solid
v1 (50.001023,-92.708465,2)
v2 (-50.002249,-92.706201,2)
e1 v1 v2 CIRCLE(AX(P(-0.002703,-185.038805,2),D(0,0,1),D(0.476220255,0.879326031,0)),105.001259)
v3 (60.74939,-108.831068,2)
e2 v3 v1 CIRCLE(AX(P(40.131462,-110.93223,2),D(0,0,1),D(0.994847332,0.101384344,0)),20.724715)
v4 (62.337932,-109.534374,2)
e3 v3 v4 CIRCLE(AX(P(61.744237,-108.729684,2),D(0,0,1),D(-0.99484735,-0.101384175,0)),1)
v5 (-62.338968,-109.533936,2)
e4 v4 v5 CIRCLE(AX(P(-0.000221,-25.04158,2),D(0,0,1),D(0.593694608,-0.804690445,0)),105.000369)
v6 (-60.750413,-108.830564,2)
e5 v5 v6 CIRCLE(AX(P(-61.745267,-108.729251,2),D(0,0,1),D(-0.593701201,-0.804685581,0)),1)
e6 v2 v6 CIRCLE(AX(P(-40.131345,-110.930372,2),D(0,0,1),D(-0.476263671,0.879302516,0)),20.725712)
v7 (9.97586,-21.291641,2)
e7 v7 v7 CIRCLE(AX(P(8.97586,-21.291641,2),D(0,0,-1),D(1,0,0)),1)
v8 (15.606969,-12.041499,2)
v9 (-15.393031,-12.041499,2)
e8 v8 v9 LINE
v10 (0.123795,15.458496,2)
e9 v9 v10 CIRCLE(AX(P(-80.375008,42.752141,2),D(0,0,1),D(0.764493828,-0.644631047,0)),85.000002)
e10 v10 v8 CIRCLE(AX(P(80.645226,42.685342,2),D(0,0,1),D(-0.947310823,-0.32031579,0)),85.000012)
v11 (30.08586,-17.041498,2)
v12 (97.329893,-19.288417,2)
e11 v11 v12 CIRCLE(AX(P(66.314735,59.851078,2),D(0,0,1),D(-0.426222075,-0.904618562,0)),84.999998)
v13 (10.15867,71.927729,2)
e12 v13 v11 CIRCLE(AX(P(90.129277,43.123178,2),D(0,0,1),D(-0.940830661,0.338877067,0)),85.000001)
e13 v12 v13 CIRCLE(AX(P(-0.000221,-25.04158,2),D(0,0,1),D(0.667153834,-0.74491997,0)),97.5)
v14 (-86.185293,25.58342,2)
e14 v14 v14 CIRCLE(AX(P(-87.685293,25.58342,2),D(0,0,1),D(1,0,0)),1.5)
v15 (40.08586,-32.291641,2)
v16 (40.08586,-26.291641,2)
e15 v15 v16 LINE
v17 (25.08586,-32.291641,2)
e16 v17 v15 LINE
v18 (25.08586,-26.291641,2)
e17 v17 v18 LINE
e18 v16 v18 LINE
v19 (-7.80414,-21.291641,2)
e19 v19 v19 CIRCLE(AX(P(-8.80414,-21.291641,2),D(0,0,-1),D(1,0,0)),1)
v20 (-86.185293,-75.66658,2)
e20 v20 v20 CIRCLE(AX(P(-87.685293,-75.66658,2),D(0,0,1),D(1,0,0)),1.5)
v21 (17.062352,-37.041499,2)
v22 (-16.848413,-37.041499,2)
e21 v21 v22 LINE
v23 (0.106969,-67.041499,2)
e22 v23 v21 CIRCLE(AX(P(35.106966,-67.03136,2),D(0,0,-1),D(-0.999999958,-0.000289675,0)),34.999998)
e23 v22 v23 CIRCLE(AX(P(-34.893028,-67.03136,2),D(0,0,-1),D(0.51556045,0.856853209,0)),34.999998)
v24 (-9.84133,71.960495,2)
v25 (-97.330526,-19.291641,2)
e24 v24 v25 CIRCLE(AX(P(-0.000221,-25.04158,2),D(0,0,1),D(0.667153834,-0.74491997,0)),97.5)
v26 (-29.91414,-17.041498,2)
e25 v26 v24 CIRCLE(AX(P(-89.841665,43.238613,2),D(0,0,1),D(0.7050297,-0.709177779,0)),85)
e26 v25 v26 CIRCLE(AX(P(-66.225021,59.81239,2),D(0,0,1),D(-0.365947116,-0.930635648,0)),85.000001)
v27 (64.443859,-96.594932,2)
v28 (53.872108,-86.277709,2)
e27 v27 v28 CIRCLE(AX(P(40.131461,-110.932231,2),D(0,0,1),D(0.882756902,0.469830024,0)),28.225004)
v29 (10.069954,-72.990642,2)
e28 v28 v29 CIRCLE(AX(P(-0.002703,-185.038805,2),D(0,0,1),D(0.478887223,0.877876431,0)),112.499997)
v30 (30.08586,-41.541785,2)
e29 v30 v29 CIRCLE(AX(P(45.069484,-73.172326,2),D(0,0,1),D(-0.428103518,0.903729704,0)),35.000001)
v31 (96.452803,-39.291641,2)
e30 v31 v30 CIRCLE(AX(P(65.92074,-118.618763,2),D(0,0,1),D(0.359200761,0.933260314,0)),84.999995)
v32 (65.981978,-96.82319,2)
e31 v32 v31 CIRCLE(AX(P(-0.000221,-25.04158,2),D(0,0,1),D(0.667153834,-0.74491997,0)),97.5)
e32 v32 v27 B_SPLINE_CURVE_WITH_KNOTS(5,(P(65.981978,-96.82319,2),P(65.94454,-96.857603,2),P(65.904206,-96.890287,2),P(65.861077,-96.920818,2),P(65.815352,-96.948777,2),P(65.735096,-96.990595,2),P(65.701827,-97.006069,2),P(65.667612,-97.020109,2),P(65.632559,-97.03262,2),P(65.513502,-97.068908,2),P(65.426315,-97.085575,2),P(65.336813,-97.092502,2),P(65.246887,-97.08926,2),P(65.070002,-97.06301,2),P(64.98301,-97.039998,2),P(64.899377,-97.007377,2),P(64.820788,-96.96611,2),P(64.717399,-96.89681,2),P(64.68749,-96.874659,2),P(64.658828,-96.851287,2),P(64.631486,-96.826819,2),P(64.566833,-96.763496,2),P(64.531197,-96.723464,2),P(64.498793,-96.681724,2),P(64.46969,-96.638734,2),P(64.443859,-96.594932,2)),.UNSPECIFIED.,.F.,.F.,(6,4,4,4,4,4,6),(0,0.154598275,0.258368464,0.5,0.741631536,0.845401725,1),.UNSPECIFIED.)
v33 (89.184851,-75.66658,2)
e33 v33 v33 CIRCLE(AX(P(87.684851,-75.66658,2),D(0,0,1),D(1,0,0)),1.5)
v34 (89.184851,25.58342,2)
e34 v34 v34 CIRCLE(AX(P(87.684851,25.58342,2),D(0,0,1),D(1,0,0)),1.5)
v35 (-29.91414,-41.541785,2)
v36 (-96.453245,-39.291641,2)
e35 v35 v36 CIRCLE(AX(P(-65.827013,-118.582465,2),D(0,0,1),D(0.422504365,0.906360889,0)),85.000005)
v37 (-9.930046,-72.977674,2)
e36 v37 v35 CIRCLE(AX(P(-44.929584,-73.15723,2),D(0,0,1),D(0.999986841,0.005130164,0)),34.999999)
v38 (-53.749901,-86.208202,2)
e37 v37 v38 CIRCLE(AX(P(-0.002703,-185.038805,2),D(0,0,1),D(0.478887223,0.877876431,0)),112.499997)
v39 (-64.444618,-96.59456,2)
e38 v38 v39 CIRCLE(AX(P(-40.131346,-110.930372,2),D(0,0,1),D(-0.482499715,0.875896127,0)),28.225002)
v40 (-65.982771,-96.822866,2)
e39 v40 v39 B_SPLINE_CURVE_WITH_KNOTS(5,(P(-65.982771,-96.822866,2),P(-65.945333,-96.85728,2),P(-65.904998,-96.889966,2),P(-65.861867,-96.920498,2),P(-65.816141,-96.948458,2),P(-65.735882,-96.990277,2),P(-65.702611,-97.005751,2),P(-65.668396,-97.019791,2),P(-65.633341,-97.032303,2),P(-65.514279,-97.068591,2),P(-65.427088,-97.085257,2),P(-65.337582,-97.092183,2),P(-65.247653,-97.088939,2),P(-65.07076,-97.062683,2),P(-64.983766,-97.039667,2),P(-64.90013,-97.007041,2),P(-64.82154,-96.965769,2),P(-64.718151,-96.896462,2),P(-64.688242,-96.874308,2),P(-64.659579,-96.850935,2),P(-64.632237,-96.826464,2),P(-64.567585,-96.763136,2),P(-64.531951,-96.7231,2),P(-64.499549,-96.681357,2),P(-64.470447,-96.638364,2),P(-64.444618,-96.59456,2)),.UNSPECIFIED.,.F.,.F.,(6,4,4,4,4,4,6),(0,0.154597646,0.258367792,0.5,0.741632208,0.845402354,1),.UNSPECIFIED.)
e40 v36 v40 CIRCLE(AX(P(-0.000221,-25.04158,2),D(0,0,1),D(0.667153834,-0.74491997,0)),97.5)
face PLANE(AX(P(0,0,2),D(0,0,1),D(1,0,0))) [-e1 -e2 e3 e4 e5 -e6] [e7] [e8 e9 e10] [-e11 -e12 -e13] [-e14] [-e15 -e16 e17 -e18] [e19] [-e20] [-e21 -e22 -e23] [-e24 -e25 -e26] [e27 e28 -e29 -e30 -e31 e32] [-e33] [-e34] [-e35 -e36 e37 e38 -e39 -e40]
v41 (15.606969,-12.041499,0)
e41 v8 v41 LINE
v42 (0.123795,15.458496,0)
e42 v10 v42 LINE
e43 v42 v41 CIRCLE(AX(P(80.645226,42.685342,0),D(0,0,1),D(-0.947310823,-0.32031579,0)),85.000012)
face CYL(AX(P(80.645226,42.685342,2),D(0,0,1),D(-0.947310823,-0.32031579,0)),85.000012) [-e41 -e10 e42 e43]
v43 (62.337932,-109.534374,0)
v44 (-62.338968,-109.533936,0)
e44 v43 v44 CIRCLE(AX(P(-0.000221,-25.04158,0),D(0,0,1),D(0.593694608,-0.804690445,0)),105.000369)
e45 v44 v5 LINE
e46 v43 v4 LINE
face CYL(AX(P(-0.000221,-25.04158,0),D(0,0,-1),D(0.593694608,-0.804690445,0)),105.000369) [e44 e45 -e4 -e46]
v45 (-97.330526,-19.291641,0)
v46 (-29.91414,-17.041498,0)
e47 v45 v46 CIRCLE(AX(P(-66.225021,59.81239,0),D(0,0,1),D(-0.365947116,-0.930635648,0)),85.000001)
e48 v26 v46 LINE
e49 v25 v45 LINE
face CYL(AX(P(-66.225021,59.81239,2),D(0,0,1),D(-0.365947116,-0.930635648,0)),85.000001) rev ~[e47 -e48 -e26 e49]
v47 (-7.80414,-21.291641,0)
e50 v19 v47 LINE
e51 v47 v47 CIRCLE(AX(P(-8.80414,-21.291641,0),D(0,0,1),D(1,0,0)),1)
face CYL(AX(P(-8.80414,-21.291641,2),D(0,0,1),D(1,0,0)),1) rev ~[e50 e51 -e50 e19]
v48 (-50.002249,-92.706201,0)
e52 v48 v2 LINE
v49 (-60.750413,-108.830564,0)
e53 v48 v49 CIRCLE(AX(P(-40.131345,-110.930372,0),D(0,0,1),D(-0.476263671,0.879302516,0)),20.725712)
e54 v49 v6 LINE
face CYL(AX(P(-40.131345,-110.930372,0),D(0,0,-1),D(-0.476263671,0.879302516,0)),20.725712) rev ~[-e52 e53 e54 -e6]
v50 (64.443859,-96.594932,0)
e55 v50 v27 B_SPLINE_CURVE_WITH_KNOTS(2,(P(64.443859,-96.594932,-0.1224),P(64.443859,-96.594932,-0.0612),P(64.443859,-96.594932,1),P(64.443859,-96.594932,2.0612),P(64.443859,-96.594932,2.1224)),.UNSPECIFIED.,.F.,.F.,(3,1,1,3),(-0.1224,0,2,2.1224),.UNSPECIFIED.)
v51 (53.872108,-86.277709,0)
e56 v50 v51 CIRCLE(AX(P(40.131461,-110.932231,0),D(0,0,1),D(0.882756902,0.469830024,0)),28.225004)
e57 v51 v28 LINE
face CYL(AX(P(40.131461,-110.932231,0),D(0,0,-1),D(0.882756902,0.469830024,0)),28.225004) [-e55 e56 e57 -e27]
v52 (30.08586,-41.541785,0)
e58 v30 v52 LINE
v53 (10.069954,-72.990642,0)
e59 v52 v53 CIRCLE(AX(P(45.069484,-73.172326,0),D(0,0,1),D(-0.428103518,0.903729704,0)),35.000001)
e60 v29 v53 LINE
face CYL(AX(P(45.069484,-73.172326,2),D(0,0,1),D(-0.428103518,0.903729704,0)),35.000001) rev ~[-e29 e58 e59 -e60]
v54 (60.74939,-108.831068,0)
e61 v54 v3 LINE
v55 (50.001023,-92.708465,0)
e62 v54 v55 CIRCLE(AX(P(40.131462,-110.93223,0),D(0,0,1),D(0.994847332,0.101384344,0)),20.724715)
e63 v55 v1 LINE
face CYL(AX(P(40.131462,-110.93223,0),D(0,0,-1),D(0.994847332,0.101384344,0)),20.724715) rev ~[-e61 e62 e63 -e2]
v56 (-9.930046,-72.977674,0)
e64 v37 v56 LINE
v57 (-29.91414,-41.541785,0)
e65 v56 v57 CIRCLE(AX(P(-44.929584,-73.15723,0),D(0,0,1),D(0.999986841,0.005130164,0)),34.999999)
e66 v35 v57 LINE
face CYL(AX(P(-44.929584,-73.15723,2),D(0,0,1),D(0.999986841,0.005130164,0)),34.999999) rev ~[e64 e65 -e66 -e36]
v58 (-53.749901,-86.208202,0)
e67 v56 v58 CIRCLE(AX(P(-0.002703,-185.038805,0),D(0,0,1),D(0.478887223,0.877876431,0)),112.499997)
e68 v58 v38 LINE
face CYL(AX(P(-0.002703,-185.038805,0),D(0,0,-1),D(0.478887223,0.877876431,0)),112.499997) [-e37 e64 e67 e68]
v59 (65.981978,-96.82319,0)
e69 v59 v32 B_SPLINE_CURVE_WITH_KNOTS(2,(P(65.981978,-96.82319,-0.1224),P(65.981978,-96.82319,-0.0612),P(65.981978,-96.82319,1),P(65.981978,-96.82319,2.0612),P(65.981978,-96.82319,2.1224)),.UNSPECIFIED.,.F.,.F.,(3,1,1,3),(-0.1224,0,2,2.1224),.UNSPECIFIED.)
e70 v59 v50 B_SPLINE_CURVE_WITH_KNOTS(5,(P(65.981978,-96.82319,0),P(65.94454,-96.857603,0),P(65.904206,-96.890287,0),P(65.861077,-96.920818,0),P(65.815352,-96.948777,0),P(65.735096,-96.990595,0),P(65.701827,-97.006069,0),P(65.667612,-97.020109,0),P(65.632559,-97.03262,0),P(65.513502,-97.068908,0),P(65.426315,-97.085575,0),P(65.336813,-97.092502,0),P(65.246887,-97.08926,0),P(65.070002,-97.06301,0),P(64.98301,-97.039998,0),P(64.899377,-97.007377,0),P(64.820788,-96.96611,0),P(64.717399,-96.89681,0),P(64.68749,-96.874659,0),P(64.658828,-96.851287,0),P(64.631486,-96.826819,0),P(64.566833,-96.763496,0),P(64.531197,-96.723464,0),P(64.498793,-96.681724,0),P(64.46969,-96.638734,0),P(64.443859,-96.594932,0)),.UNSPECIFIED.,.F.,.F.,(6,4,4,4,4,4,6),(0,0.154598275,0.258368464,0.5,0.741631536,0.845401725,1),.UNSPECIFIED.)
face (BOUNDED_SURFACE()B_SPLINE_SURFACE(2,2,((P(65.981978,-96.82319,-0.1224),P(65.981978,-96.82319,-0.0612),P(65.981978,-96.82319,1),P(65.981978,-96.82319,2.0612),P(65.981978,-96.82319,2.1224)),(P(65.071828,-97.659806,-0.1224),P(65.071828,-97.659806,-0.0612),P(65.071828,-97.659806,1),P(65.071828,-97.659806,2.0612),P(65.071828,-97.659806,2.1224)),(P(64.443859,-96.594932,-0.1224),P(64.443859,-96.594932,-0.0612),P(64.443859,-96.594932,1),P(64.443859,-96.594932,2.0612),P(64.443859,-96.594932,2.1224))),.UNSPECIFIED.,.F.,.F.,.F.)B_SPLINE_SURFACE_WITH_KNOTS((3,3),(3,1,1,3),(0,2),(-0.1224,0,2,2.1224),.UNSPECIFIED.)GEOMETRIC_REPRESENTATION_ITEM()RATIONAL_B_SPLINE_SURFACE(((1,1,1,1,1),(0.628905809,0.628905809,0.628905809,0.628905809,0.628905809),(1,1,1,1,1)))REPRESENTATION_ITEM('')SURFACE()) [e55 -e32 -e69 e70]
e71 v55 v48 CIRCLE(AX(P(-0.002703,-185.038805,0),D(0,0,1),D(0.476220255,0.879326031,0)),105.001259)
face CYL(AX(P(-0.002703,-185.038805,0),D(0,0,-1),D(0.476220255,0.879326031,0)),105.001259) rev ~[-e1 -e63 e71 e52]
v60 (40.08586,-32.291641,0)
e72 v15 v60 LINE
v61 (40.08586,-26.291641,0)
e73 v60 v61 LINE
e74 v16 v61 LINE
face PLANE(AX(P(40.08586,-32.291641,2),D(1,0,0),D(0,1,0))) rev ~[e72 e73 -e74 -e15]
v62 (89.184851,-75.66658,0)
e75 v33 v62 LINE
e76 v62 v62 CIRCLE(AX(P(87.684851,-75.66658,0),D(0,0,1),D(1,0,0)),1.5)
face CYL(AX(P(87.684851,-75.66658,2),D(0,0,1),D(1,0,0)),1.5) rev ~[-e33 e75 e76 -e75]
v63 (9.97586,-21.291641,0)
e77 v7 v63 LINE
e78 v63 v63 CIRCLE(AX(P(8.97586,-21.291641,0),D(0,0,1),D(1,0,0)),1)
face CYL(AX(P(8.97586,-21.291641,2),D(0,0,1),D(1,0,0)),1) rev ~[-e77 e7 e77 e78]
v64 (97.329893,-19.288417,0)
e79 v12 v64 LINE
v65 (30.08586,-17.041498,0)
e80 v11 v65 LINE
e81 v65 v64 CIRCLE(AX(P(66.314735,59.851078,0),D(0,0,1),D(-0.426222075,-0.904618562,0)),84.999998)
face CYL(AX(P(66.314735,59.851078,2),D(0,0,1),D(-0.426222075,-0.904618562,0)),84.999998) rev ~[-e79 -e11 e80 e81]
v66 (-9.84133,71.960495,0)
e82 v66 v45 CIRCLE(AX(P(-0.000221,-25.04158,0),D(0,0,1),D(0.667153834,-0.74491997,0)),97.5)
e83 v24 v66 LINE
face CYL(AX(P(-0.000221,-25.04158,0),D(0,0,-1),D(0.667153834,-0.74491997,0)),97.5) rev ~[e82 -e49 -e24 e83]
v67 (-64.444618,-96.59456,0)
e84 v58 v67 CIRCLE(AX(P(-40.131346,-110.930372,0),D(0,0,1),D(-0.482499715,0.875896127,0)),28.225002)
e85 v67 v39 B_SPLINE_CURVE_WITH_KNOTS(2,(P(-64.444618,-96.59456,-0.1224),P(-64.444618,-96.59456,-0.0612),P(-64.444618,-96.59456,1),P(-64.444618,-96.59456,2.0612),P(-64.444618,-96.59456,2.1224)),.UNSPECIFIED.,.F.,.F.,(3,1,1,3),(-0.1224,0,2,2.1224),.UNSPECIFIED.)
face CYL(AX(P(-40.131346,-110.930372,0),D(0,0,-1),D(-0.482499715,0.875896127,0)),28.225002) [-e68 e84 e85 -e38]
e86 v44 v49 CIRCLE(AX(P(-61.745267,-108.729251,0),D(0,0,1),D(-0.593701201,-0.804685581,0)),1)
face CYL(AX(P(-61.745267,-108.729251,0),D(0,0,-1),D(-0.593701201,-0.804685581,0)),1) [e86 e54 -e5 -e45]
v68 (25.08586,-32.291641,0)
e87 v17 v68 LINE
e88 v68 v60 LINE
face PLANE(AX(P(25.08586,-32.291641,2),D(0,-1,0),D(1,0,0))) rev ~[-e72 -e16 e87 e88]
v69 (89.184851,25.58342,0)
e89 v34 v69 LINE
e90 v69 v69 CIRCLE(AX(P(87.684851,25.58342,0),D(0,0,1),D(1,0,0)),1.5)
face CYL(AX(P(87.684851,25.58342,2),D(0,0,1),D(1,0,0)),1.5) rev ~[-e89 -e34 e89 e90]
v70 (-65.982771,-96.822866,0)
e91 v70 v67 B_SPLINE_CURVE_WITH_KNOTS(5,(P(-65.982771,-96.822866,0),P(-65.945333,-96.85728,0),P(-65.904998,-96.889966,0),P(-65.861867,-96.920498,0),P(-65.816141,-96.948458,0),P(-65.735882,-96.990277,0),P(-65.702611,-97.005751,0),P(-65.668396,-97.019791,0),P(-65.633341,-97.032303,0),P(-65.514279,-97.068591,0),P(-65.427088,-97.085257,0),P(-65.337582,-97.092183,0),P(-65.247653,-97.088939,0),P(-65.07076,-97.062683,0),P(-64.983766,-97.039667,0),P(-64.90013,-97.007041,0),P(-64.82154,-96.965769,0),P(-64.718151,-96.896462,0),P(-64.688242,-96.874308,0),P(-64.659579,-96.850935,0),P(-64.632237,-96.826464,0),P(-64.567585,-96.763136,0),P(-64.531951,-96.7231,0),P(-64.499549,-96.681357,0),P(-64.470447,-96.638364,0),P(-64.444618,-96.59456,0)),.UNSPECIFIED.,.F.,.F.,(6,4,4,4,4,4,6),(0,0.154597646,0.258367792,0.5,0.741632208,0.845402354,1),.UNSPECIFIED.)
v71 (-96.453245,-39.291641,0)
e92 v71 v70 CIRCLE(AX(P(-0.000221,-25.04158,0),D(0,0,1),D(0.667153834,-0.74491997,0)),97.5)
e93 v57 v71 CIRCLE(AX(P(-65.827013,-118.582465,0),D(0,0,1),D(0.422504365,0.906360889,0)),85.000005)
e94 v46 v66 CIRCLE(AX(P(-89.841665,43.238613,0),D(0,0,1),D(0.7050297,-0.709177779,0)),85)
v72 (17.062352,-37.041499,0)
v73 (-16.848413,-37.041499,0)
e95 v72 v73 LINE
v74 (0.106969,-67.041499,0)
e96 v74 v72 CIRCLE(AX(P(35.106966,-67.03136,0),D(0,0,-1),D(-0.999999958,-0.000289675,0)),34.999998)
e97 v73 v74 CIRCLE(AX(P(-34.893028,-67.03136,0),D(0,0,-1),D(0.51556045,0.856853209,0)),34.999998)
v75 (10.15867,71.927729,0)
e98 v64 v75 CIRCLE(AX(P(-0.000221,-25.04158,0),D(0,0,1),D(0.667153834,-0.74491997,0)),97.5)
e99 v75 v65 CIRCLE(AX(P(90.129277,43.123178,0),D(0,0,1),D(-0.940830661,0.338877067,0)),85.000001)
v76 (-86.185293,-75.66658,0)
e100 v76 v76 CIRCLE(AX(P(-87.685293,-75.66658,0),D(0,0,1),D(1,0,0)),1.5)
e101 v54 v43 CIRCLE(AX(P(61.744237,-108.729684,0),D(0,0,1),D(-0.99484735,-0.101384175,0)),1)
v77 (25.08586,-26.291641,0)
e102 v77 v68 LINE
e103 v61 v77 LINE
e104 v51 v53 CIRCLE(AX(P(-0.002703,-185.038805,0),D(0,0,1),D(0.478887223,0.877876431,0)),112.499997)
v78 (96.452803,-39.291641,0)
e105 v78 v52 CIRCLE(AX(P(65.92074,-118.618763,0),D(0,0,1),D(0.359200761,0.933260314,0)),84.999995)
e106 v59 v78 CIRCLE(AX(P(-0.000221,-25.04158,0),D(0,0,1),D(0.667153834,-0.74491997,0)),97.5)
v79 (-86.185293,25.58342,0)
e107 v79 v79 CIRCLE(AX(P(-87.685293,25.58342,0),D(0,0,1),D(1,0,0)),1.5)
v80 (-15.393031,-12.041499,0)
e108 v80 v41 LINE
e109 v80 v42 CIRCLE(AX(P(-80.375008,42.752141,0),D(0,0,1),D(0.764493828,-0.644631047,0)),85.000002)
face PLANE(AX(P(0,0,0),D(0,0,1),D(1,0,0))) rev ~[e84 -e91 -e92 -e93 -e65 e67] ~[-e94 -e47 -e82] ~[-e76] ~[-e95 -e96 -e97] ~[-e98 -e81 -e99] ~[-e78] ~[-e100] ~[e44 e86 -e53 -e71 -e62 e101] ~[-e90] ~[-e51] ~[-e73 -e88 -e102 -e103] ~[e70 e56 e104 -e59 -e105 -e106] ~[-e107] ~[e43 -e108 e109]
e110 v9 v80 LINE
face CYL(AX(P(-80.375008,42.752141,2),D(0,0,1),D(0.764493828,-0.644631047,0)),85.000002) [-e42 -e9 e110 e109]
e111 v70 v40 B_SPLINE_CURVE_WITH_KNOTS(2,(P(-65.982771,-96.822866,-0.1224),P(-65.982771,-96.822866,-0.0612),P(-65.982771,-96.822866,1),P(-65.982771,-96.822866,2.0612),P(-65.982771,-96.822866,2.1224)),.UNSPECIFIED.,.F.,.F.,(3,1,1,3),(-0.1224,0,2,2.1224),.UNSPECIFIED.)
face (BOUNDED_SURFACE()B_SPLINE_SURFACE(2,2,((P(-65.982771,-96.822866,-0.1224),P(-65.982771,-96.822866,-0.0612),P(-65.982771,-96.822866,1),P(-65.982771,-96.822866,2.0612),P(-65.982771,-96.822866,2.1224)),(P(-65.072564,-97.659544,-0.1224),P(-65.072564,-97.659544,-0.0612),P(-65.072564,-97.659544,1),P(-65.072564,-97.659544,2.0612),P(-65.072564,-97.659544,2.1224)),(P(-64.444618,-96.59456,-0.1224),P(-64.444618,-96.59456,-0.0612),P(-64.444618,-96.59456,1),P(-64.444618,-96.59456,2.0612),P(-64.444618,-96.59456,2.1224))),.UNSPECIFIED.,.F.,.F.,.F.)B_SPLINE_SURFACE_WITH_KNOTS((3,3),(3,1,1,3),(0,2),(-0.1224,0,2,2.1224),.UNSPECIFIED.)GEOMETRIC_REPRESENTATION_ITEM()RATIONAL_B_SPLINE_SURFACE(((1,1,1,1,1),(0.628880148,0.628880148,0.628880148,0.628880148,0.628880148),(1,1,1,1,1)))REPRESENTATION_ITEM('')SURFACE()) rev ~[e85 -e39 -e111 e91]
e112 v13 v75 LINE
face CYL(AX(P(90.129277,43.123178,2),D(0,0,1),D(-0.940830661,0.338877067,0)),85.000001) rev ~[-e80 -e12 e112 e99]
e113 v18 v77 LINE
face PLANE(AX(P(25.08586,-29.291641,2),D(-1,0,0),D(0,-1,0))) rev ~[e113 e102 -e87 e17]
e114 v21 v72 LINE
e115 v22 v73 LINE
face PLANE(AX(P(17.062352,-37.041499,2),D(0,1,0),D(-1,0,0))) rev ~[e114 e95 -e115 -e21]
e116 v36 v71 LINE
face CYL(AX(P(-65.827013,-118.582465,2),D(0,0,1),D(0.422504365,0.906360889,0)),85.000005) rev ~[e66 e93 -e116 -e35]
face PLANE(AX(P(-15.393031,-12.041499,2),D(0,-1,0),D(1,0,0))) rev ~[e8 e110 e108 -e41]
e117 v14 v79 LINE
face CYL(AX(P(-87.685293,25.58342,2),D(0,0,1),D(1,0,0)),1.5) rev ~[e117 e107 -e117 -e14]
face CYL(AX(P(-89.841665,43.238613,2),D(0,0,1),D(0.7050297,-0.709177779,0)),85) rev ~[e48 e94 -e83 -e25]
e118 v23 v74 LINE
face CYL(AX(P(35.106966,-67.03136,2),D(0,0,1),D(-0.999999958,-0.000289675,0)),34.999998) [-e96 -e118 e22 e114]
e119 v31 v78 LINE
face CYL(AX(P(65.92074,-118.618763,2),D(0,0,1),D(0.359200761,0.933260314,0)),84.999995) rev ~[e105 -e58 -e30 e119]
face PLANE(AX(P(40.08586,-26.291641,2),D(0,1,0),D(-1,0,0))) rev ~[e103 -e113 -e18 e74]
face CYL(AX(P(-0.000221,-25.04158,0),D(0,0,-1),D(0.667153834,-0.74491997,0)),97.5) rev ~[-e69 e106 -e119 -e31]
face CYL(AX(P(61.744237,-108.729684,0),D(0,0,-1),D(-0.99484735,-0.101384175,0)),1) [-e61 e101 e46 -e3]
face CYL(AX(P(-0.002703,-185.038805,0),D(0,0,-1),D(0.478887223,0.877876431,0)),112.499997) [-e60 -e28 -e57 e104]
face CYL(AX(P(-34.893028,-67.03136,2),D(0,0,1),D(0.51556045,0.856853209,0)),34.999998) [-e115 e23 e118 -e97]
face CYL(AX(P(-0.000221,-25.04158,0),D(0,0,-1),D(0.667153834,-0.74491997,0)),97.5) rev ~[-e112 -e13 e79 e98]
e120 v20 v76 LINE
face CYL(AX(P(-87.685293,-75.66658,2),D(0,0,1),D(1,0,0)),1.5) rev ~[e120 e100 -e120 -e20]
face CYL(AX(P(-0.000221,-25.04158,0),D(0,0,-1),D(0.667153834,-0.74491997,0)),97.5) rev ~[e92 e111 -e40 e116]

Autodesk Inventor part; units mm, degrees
ref_plane "YZ Plane" through (0, 0, 0) normal (1, 0, 0) x (0, 1, 0)
ref_plane "XZ Plane" through (0, 0, 0) normal (0, 1, 0) x (-1, 0, 0)
ref_plane "XY Plane" through (0, 0, 0) normal (0, 0, 1) x (1, 0, 0)
sketch "Sketch1" plane through (0, 0, 0) normal (0, 0, 1) x (1, 0, 0)
  arc A0 (62.337932, -109.534374) -> (-62.338968, -109.533936) centre (-0.000221, -25.04158) ccw
  arc A1 (-62.338968, -109.533936) -> (-60.750413, -108.830564) centre (-61.745267, -108.72925) ccw
  arc A2 (-50.002249, -92.706201) -> (-60.750413, -108.830564) centre (-40.131347, -110.93037) ccw
  arc A3 (50.001023, -92.708465) -> (-50.002249, -92.706201) centre (-0.002704, -185.038808) ccw
  arc A4 (60.74939, -108.831068) -> (62.337932, -109.534374) centre (61.744237, -108.729684) ccw
  arc A5 (60.74939, -108.831068) -> (50.001023, -92.708465) centre (40.131464, -110.932229) ccw
  arc A6 (53.872108, -86.277709) -> (-53.749901, -86.208202) centre (-0.002704, -185.038808) ccw construction
  arc A7 (65.047278, -97.671277) -> (53.872108, -86.277709) centre (40.131464, -110.932229) ccw construction
  arc A8 (65.047278, -97.671277) -> (-65.048011, -97.671016) centre (-0.000221, -25.04158) ccw construction
  arc A9 (-53.749901, -86.208202) -> (-65.048011, -97.671016) centre (-40.131347, -110.93037) ccw construction
  arc A10 (65.047278, -97.671277) -> (-65.048011, -97.671016) centre (-0.000221, -25.04158) ccw
  arc A11 (-53.749901, -86.208202) -> (-65.048011, -97.671016) centre (-40.131347, -110.93037) ccw
  arc A12 (53.872108, -86.277709) -> (-53.749901, -86.208202) centre (-0.002704, -185.038808) ccw
  arc A13 (65.047278, -97.671277) -> (53.872108, -86.277709) centre (40.131464, -110.932229) ccw
  point P0 (0, 0)
extrude "Extrusion1" add sketch "Sketch1" along normal blind 2
fillet "Fillet1" radius 1 2 edges at (-65.048, -97.671, 1) (65.0473, -97.6713, 1)
sketch "Sketch2" plane through (0, 0, 2) normal (0, 0, 1) x (1, 0, 0)
  arc A0 (65.981978, -96.82319) -> (-65.982771, -96.822866) centre (-0.000221, -25.04158) ccw construction
  circle A1 centre (-0.000221, -25.04158) radius 101.25 construction
  line L0 (-0.000221, -25.04158) -> (-87.685293, 25.58342) construction
  line L1 (-0.000221, -25.04158) -> (101.249779, -25.04158) construction
  line L2 (-0.000221, -25.04158) -> (87.684851, 25.58342) construction
  line L3 (-0.000221, -25.04158) -> (-87.685293, -75.66658) construction
  line L4 (-0.000221, -25.04158) -> (101.249779, -25.04158) construction
  line L5 (-0.000221, -25.04158) -> (87.684851, -75.66658) construction
  line L6 (-0.000221, -25.04158) -> (101.249779, -25.04158) construction
  line L7 (-0.000221, -25.04158) -> (101.249779, -25.04158) construction
  circle A2 centre (87.684851, 25.58342) radius 1.5
  circle A3 centre (87.684851, -75.66658) radius 1.5
  circle A4 centre (-87.685293, -75.66658) radius 1.5
  circle A5 centre (-87.685293, 25.58342) radius 1.5
  line L8 (-0.000221, -25.04158) -> (-0.000221, -72.538808) construction
  arc A6 (53.872108, -86.277709) -> (-53.749901, -86.208202) centre (-0.002704, -185.038808) ccw construction
  line L9 (-0.000221, -72.538808) -> (-0.000221, -80.037547) construction
  arc A7 (50.001023, -92.708465) -> (-50.002249, -92.706201) centre (-0.002704, -185.038808) ccw construction
  circle A8 centre (-0.000221, -76.288177) radius 1.5
  point P0 (0, 0)
  dimension "d7" = 202.5
  dimension "d8" = 150
  dimension "d9" = 150
  dimension "d10" = 30
  dimension "d14" = 3
  dimension "d15" = 3
  dimension "d16" = 3
  dimension "d17" = 3
  dimension "d18" = 3
extrude "Extrusion3" cut sketch "Sketch2" against normal up to next contours A2 | A3 | A4 | A5
sketch "Sketch3" plane through (0, 0, 2) normal (0, 0, 1) x (1, 0, 0)
  arc A0 (10.069954, -72.990642) -> (-9.930046, -72.977674) centre (-0.002704, -185.038808) ccw
  line L0 (0.08586, -41.541785) -> (-29.91414, -41.541785) construction
  line L1 (-29.91414, -41.541785) -> (30.08586, -41.541785) construction
  line L2 (30.08586, -41.541785) -> (30.08586, -17.041498) construction
  line L3 (30.08586, -17.041498) -> (-29.91414, -17.041498) construction
  line L4 (-29.91414, -17.041498) -> (-29.91414, -41.541785) construction
  line L5 (30.08586, -29.291641) -> (97.407104, -29.291641) construction
  line L6 (30.08586, -29.291641) -> (97.407104, -29.291641) construction
  line L7 (-29.91414, -29.291641) -> (-97.407546, -29.291641) construction
  line L8 (0.069954, -72.538832) -> (0.213372, 161.863698) construction
  line L9 (-29.91414, -29.291641) -> (30.08586, -29.291641) construction
  line L10 (0.08586, -29.291641) -> (-8.80414, -29.291641) construction
  line L11 (0.08586, -29.291641) -> (8.97586, -29.291641) construction
  line L12 (-8.80414, -29.291641) -> (8.97586, -29.291641)
  arc A1 (30.08586, -41.541785) -> (10.069954, -72.990642) centre (45.069483, -73.172325) ccw
  arc A2 (-9.930046, -72.977674) -> (-29.91414, -41.541785) centre (-44.929585, -73.15723) ccw
  arc A3 (96.452803, -39.291641) -> (30.08586, -41.541785) centre (65.920739, -118.618769) ccw
  line L13 (-97.407546, -29.291641) -> (-87.407546, -29.291641) construction
  arc A4 (-29.91414, -41.541785) -> (-96.453245, -39.291641) centre (-65.827012, -118.58246) ccw
  line L14 (-97.407546, -29.291641) -> (-87.407546, -29.291641) construction
  arc A5 (-97.330526, -19.291641) -> (-29.91414, -17.041498) centre (-66.225021, 59.812389) ccw
  arc A6 (30.08586, -17.041498) -> (97.329893, -19.288417) centre (66.314736, 59.85108) ccw
  arc A7 (10.15867, 71.927729) -> (30.08586, -17.041498) centre (90.129276, 43.123178) ccw
  arc A8 (-29.91414, -17.041498) -> (-9.84133, 71.960495) centre (-89.841664, 43.238613) ccw
  line L15 (0.10391, -17.041498) -> (0.106969, -12.041499)
  line L16 (0.106969, -12.041499) -> (0.123795, 15.458496) construction
  line L17 (0.106969, -12.041499) -> (15.606969, -12.041499) construction
  line L18 (0.106969, -12.041499) -> (-15.393031, -12.041499) construction
  arc A9 (-15.393031, -12.041499) -> (0.123795, 15.458496) centre (-80.375006, 42.75214) ccw construction
  arc A10 (0.123795, 15.458496) -> (15.606969, -12.041499) centre (80.645215, 42.685337) ccw construction
  line L19 (-15.393031, -12.041499) -> (15.606969, -12.041499)
  arc A11 (-15.393031, -12.041499) -> (0.123795, 15.458496) centre (-80.375006, 42.75214) ccw
  arc A12 (0.123795, 15.458496) -> (15.606969, -12.041499) centre (80.645215, 42.685337) ccw
  line L20 (0.08586, -41.541785) -> (0.08586, -46.541785)
  line L21 (0.08586, -41.541785) -> (5.08586, -41.541785) construction
  arc A13 (96.452803, -39.291641) -> (97.329893, -19.288417) centre (-0.000221, -25.04158) ccw
  arc A14 (10.15867, 71.927729) -> (-9.84133, 71.960495) centre (-0.000221, -25.04158) ccw
  arc A15 (-97.330526, -19.291641) -> (-96.453245, -39.291641) centre (-0.000221, -25.04158) ccw
  line L22 (-29.91414, -29.291641) -> (-29.91414, -34.291641) construction
  line L23 (8.97586, -29.291641) -> (8.97586, -21.291641)
  line L24 (-8.80414, -29.291641) -> (-8.80414, -21.291641)
  circle A16 centre (-8.80414, -21.291641) radius 1
  circle A17 centre (8.97586, -21.291641) radius 1
  point P0 (0, 0)
  dimension "d30" = 30
  dimension "d31" = 60
  dimension "d43" = 8.89
  dimension "d44" = 180
  dimension "d46" = 17.78
  dimension "d55" = 35
  dimension "d56" = 35
  dimension "d60" = 85
  dimension "d63" = 85
  dimension "d66" = 85
  dimension "d67" = 85
  dimension "d72" = 85
  dimension "d73" = 85
  dimension "d74" = 5
  dimension "d75" = 27.5
  dimension "d76" = 15.5
  dimension "d77" = 15.5
  dimension "d78" = 85
  dimension "d79" = 85
  dimension "d80" = 5
  dimension "d81" = 90
  dimension "d89" = 5
  dimension "d109" = 8
  dimension "d110" = 8
  dimension "d111" = 2
  dimension "d112" = 2
sketch "Sketch6" plane through (0, 0, 2) normal (0, 0, 1) x (1, 0, 0)
  arc A0 (53.872108, -86.277709) -> (-53.749901, -86.208202) centre (-0.002704, -185.038808) ccw
  arc A1 (-53.749901, -86.208202) -> (-64.444618, -96.59456) centre (-40.131347, -110.93037) ccw
  arc A2 (-65.982771, -96.822866) -> (-64.444618, -96.59456) centre (-65.306027, -96.086648) ccw
  arc A3 (65.981978, -96.82319) -> (-65.982771, -96.822866) centre (-0.000221, -25.04158) ccw
  arc A4 (64.443859, -96.594932) -> (65.981978, -96.82319) centre (65.305237, -96.086968) ccw
  arc A5 (64.443859, -96.594932) -> (53.872108, -86.277709) centre (40.131464, -110.932229) ccw
  circle A6 centre (-87.685293, -75.66658) radius 1.5
  circle A7 centre (87.684851, 25.58342) radius 1.5
  circle A8 centre (87.684851, -75.66658) radius 1.5
  circle A9 centre (-87.685293, 25.58342) radius 1.5
  arc A10 (62.337932, -109.534374) -> (-62.338968, -109.533936) centre (-0.000221, -25.04158) ccw
  arc A11 (-62.338968, -109.533936) -> (-60.750413, -108.830564) centre (-61.745267, -108.72925) ccw
  arc A12 (-50.002249, -92.706201) -> (-60.750413, -108.830564) centre (-40.131347, -110.93037) ccw
  arc A13 (50.001023, -92.708465) -> (-50.002249, -92.706201) centre (-0.002704, -185.038808) ccw
  arc A14 (60.74939, -108.831068) -> (50.001023, -92.708465) centre (40.131464, -110.932229) ccw
  arc A15 (60.74939, -108.831068) -> (62.337932, -109.534374) centre (61.744237, -108.729684) ccw
  line L0 (-8.80414, -29.291641) -> (8.97586, -29.291641)
  line L1 (0.08586, -29.291641) -> (20.08586, -29.291641)
  line L2 (20.08586, -29.291641) -> (25.08586, -29.291641)
  line L3 (25.08586, -29.291641) -> (25.08586, -26.291641)
  line L4 (25.08586, -26.291641) -> (25.08586, -32.291641)
  line L5 (25.08586, -32.291641) -> (40.08586, -32.291641)
  line L6 (40.08586, -32.291641) -> (40.08586, -26.291641)
  line L7 (40.08586, -26.291641) -> (25.08586, -26.291641)
  point P0 (0, 0)
  dimension "d101" = 20
  dimension "d102" = 5
  dimension "d103" = 3
  dimension "d104" = 6
  dimension "d105" = 15
  dimension "d106" = 6
extrude "Extrusion9" add sketch "Sketch3" against normal blind 2
extrude "Extrusion10" cut sketch "Sketch6" against normal blind 2 contours L3 L7 L6 L5 L4
sketch "Sketch7" plane through (0, 0, 2) normal (0, 0, 1) x (1, 0, 0)
  line L0 (40.08586, -32.291641) -> (25.08586, -32.291641)
  line L1 (25.08586, -32.291641) -> (25.08586, -26.291641)
  line L2 (25.08586, -26.291641) -> (40.08586, -26.291641)
  line L3 (40.08586, -26.291641) -> (40.08586, -32.291641)
  arc A0 (-9.930046, -72.977674) -> (-53.749901, -86.208202) centre (-0.002704, -185.038808) ccw
  arc A1 (-53.749901, -86.208202) -> (-64.444618, -96.59456) centre (-40.131347, -110.93037) ccw
  arc A2 (-65.982771, -96.822866) -> (-64.444618, -96.59456) centre (-65.306027, -96.086648) ccw
  arc A3 (-96.453245, -39.291641) -> (-65.982771, -96.822866) centre (-0.000221, -25.04158) ccw
  arc A4 (-29.91414, -41.541785) -> (-96.453245, -39.291641) centre (-65.827012, -118.58246) ccw
  arc A5 (-9.930046, -72.977674) -> (-29.91414, -41.541785) centre (-44.929585, -73.15723) ccw
  arc A6 (30.08586, -41.541785) -> (10.069954, -72.990642) centre (45.069483, -73.172325) ccw
  arc A7 (96.452803, -39.291641) -> (30.08586, -41.541785) centre (65.920739, -118.618769) ccw
  arc A8 (65.981978, -96.82319) -> (96.452803, -39.291641) centre (-0.000221, -25.04158) ccw
  arc A9 (64.443859, -96.594932) -> (65.981978, -96.82319) centre (65.305237, -96.086968) ccw
  arc A10 (64.443859, -96.594932) -> (53.872108, -86.277709) centre (40.131464, -110.932229) ccw
  arc A11 (53.872108, -86.277709) -> (10.069954, -72.990642) centre (-0.002704, -185.038808) ccw
  arc A12 (30.08586, -17.041498) -> (97.329893, -19.288417) centre (66.314736, 59.85108) ccw
  arc A13 (10.15867, 71.927729) -> (30.08586, -17.041498) centre (90.129276, 43.123178) ccw
  arc A14 (97.329893, -19.288417) -> (10.15867, 71.927729) centre (-0.000221, -25.04158) ccw
  circle A15 centre (-8.80414, -21.291641) radius 1
  circle A16 centre (8.97586, -21.291641) radius 1
  line L4 (15.606969, -12.041499) -> (-15.393031, -12.041499)
  arc A17 (-15.393031, -12.041499) -> (0.123795, 15.458496) centre (-80.375006, 42.75214) ccw
  arc A18 (0.123795, 15.458496) -> (15.606969, -12.041499) centre (80.645215, 42.685337) ccw
  circle A19 centre (-87.685293, -75.66658) radius 1.5
  circle A20 centre (87.684851, 25.58342) radius 1.5
  circle A21 centre (87.684851, -75.66658) radius 1.5
  circle A22 centre (-87.685293, 25.58342) radius 1.5
  arc A23 (-29.91414, -17.041498) -> (-9.84133, 71.960495) centre (-89.841664, 43.238613) ccw
  arc A24 (-97.330526, -19.291641) -> (-29.91414, -17.041498) centre (-66.225021, 59.812389) ccw
  arc A25 (-9.84133, 71.960495) -> (-97.330526, -19.291641) centre (-0.000221, -25.04158) ccw
  arc A26 (62.337932, -109.534374) -> (-62.338968, -109.533936) centre (-0.000221, -25.04158) ccw
  arc A27 (-62.338968, -109.533936) -> (-60.750413, -108.830564) centre (-61.745267, -108.72925) ccw
  arc A28 (-50.002249, -92.706201) -> (-60.750413, -108.830564) centre (-40.131347, -110.93037) ccw
  arc A29 (50.001023, -92.708465) -> (-50.002249, -92.706201) centre (-0.002704, -185.038808) ccw
  arc A30 (60.74939, -108.831068) -> (50.001023, -92.708465) centre (40.131464, -110.932229) ccw
  arc A31 (60.74939, -108.831068) -> (62.337932, -109.534374) centre (61.744237, -108.729684) ccw
  line L5 (15.606969, -12.041499) -> (-15.393031, -12.041499)
  line L6 (0.106969, -12.041499) -> (0.106969, -37.041499)
  line L7 (-16.848413, -37.041499) -> (17.062352, -37.041499)
  line L8 (0.106969, -37.041499) -> (0.106969, -67.041499)
  arc A32 (0.106969, -67.041499) -> (-16.848413, -37.041499) centre (-34.893029, -67.031361) ccw
  arc A33 (17.062352, -37.041499) -> (0.106969, -67.041499) centre (35.106968, -67.031361) ccw
  point P0 (0, 0)
  dimension "d117" = 25
  dimension "d118" = 30
  dimension "d119" = 35
  dimension "d120" = 35
  dimension "d123" = 25
sketch "Sketch7 outline for Extrusion11" plane through (0, 0, 2) normal (0, 0, 1) x (1, 0, 0)
  arc A0 (-16.848413, -37.041499) -> (0.106969, -67.041499) centre (-34.893029, -67.031361) cw
  line L0 (17.062352, -37.041499) -> (-16.848413, -37.041499)
  arc A1 (0.106969, -67.041499) -> (17.062352, -37.041499) centre (35.106968, -67.031361) cw
extrude "Extrusion11" cut sketch "Sketch7 outline for Extrusion11" against normal blind 2
properties part number "Handle"
